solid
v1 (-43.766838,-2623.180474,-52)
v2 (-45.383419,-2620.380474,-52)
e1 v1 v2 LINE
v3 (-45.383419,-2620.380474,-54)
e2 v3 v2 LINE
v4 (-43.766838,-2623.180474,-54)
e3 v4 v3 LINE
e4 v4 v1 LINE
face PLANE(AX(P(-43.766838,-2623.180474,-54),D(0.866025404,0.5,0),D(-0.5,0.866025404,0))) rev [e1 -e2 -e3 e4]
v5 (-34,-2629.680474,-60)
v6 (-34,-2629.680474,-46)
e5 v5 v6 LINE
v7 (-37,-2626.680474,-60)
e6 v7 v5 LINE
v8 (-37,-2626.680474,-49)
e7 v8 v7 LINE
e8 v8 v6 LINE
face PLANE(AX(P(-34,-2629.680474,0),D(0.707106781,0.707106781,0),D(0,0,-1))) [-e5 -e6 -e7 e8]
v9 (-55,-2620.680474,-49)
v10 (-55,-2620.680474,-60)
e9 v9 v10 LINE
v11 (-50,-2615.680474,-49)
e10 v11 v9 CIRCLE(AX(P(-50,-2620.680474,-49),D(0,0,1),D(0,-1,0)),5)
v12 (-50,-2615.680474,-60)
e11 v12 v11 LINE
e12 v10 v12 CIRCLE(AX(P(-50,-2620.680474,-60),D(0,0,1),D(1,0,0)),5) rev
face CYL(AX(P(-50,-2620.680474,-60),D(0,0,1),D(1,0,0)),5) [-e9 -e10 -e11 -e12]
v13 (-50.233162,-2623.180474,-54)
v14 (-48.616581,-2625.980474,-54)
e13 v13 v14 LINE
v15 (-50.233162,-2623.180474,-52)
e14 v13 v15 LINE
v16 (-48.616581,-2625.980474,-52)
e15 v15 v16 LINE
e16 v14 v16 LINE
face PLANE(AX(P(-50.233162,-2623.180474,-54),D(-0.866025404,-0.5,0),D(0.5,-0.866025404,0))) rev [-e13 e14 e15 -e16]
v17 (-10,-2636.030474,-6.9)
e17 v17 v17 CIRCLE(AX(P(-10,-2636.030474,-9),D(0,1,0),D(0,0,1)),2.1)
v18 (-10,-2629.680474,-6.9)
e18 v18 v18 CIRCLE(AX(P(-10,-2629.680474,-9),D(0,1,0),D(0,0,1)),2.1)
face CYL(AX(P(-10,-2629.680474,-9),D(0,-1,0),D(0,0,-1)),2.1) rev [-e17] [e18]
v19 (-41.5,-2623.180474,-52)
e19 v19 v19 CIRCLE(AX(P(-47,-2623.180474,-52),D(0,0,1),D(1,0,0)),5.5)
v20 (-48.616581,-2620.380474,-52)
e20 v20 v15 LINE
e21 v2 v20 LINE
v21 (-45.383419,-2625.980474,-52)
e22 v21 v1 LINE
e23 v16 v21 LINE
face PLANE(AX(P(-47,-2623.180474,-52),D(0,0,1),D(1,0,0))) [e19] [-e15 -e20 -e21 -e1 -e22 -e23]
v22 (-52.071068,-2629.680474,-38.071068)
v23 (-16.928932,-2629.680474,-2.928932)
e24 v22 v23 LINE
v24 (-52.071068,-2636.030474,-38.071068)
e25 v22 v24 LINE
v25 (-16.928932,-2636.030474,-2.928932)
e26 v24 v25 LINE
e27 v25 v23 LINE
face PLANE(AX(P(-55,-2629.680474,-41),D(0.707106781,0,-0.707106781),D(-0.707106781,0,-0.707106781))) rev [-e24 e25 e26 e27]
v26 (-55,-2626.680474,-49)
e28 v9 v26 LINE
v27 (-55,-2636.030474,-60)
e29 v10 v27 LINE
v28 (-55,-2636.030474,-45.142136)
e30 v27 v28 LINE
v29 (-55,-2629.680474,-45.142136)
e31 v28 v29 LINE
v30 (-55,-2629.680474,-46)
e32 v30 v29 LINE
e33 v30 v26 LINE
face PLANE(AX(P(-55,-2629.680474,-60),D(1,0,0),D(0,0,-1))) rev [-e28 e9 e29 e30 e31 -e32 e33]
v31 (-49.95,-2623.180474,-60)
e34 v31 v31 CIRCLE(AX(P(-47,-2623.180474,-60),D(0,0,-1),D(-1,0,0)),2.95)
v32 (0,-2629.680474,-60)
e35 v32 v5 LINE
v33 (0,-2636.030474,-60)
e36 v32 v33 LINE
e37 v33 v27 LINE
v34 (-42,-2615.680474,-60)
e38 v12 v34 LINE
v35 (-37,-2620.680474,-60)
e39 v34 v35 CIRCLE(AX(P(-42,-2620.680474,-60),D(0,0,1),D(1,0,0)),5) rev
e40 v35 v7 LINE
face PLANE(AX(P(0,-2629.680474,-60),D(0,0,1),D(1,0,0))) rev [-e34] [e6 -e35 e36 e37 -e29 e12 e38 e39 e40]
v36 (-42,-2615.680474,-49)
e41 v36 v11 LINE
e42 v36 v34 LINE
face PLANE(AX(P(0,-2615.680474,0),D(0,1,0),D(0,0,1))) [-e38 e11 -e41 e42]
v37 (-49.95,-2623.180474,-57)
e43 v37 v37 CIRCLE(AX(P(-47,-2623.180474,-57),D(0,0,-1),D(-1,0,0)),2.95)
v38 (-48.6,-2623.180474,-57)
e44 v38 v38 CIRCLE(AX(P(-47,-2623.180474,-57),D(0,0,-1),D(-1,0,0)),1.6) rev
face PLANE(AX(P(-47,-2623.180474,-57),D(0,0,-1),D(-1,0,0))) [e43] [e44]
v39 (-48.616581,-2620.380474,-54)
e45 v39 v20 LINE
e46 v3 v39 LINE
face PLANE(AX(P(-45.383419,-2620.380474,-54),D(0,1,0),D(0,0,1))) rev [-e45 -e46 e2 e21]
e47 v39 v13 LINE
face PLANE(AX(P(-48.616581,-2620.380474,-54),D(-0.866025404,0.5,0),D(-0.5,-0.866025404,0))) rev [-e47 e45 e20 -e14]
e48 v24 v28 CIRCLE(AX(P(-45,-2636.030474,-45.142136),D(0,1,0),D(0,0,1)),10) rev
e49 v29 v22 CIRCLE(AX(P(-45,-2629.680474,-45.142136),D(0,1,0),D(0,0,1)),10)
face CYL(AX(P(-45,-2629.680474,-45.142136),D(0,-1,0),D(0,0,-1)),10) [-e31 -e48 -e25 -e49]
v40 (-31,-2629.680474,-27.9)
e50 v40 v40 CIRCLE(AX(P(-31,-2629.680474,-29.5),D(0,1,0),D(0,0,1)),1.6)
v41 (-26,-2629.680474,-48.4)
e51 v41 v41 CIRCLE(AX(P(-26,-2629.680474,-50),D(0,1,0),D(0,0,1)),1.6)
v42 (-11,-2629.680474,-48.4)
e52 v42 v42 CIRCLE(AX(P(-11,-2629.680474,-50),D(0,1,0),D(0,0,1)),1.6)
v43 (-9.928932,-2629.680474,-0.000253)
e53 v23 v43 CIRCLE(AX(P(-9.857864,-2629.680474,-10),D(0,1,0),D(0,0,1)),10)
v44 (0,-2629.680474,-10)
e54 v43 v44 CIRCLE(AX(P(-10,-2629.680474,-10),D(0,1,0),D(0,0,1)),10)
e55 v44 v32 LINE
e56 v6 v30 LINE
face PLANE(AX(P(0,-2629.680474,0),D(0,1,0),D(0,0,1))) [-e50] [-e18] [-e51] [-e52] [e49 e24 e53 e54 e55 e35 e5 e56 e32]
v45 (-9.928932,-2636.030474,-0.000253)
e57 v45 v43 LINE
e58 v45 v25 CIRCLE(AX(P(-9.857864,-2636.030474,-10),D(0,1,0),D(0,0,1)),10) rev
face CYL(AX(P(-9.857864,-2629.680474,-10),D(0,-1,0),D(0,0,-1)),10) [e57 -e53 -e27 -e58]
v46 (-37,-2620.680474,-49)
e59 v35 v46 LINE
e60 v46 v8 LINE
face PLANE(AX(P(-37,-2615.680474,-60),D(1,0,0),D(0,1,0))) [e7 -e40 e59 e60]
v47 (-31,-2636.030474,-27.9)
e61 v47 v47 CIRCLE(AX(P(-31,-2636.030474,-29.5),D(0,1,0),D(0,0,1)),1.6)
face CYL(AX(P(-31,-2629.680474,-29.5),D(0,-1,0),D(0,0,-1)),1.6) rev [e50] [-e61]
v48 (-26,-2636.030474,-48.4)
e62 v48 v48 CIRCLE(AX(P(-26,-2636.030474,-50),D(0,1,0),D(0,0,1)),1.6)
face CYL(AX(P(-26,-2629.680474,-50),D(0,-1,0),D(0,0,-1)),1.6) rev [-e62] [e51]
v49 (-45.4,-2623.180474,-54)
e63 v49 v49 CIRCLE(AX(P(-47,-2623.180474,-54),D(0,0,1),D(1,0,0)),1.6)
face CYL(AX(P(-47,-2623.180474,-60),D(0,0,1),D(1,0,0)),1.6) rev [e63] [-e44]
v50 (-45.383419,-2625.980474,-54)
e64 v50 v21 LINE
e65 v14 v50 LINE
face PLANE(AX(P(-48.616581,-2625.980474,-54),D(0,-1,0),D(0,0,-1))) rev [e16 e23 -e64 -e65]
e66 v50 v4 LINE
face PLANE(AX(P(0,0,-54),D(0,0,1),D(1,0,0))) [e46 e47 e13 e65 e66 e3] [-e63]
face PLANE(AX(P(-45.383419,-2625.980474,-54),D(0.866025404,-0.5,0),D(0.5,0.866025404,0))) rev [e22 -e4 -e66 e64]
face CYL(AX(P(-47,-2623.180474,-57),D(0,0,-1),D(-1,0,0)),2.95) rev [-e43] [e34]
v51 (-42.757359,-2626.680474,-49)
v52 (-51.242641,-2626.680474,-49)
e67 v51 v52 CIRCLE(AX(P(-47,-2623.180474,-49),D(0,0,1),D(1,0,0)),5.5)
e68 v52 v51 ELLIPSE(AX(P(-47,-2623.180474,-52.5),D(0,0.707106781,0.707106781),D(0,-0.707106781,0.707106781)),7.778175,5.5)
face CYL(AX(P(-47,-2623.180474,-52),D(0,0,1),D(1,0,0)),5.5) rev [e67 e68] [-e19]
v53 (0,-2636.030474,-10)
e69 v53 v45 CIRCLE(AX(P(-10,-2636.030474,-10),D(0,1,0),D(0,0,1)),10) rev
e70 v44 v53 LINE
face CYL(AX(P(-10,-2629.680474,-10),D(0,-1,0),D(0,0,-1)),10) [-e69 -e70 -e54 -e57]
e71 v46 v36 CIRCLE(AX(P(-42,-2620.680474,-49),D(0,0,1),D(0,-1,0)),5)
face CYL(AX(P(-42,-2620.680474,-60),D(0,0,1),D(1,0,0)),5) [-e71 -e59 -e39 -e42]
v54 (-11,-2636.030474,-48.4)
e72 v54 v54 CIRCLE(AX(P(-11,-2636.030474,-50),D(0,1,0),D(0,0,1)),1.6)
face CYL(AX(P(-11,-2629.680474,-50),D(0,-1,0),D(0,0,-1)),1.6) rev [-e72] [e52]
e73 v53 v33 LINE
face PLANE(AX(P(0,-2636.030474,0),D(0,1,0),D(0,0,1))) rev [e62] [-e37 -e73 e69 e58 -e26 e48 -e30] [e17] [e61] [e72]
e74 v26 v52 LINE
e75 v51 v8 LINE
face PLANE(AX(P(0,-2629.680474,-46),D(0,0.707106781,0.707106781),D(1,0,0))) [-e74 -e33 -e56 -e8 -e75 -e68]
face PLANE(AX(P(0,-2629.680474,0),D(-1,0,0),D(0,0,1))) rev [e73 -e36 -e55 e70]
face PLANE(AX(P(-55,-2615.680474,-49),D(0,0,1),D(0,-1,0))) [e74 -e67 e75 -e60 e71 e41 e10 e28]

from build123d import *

# Parameters (mm, degrees)
SKETCH1_R           = 2.1
SKETCH1_R_2         = 1.6
BOSS_EXTRUDE1_DEPTH = 6.35
SKETCH2_W           = 18
SKETCH2_H           = 11
BOSS_EXTRUDE2_DEPTH = 14
SKETCH3_R           = 5.5
CUT_EXTRUDE1_DEPTH  = 3
CHAMFER1_SIZE       = 3
FILLET2_R           = 10
FILLET3_R           = 5
CUT_EXTRUDE2_DEPTH  = 2
SKETCH5_R           = 1.6
CUT_EXTRUDE3_DEPTH  = 2638.157111638
SKETCH6_R           = 2.95
CUT_EXTRUDE4_DEPTH  = 3


with BuildPart() as part:
    # Sketch1 → Boss-Extrude1 (new body)
    with BuildSketch(Plane(origin=(251.886129178, -2636.030473787, -0.277944786), x_dir=(1, 0, 0), z_dir=(0, 1, 0))):
        Polygon((-265.886129178, -0.277944786), (-251.886129178, -0.277944786), (-251.886129178, 59.722055214), (-306.886129178, 59.722055214), (-306.886129178, 40.722055214), align=None)
        with Locations(Location((-261.886129178, 8.722055214, 0), (0, 0, 270))):
            Circle(SKETCH1_R, mode=Mode.SUBTRACT)
        with Locations(Location((-282.886129178, 29.222055214, 0), (0, 0, 270))):
            Circle(SKETCH1_R_2, mode=Mode.SUBTRACT)
        with Locations(Location((-262.886129178, 49.722055214, 0), (0, 0, 270))):
            Circle(SKETCH1_R_2, mode=Mode.SUBTRACT)
        with Locations(Location((-277.886129178, 49.722055214, 0), (0, 0, 270))):
            Circle(SKETCH1_R_2, mode=Mode.SUBTRACT)
    extrude(amount=BOSS_EXTRUDE1_DEPTH)

    # Sketch2 → Boss-Extrude2 (add)
    with BuildSketch(Plane(origin=(-55, -2629.680473787, -60), x_dir=(1, 0, 0), z_dir=(0, -1, 0))):
        with Locations((9, 5.5)):
            Rectangle(SKETCH2_W, SKETCH2_H)
    extrude(amount=-BOSS_EXTRUDE2_DEPTH)

    # Sketch3 → Cut-Extrude1 (cut)
    with BuildSketch(Plane.XY.offset(-49)):
        with Locations((-47, -2623.180473787)):
            Circle(SKETCH3_R)
    extrude(amount=-CUT_EXTRUDE1_DEPTH, mode=Mode.SUBTRACT)

    # Chamfer1
    # the kernel refuses this chamfer: 3 mm, written as the material it adds along each edge
    with BuildSketch(Plane(origin=(-37, -2629.680473787, -49), x_dir=(0, -0.02749587661065579, 0.9996219169112949), z_dir=(-1, 0, 0))) as chamfer1_piece_1_section:
        Polygon((CHAMFER1_SIZE * 0.999621916911, CHAMFER1_SIZE * 0.0274958766107), (-CHAMFER1_SIZE * 0.0274958766107, CHAMFER1_SIZE * 0.999621916911), (0, 0), align=None)
    chamfer1_piece_1 = extrude(amount=18, mode=Mode.PRIVATE)
    chamfer1_piece_1 = chamfer1_piece_1 - Plane(origin=(-47, -2623.180473787, -47.945016367), x_dir=(1, 0, 0), z_dir=(0, 0, 1)) * Cylinder(5.5, 48, mode=Mode.PRIVATE)
    add(chamfer1_piece_1)
    with BuildSketch(Plane(origin=(-37, -2629.680473787, -60), x_dir=(0.9996219169112948, -0.027495876610655785, 0), z_dir=(0, 0, 1))) as chamfer1_piece_2:
        Polygon((CHAMFER1_SIZE * 0.999621916911, CHAMFER1_SIZE * 0.0274958766107), (-CHAMFER1_SIZE * 0.0274958766107, CHAMFER1_SIZE * 0.999621916911), (0, 0), align=None)
    extrude(amount=11)
    with BuildSketch(Plane(origin=(-29.284951036, -2629.680473787, -49), x_dir=(0, -0.02749587661065579, 0.9996219169112949), z_dir=(-1, 0, 0))) as chamfer1_piece_3a_section:
        Polygon((CHAMFER1_SIZE * 0.999621916911, CHAMFER1_SIZE * 0.0274958766107), (-CHAMFER1_SIZE * 0.0274958766107, CHAMFER1_SIZE * 0.999621916911), (0, 0), align=None)
    chamfer1_piece_3a = extrude(amount=25.715048964, mode=Mode.PRIVATE)
    chamfer1_piece_3a = split(chamfer1_piece_3a, bisect_by=Plane(origin=(-37, -2628.691092907, -48.01061912), z_dir=(1, 0, 0)), keep=Keep.TOP, mode=Mode.PRIVATE)
    with BuildSketch(Plane(origin=(-37, -2629.680473787, -60), x_dir=(0.9996219169112948, -0.027495876610655785, 0), z_dir=(0, 0, 1))) as chamfer1_piece_3b_section:
        Polygon((CHAMFER1_SIZE * 0.999621916911, CHAMFER1_SIZE * 0.0274958766107), (-CHAMFER1_SIZE * 0.0274958766107, CHAMFER1_SIZE * 0.999621916911), (0, 0), align=None)
    chamfer1_piece_3b = extrude(amount=18.715048964, mode=Mode.PRIVATE)
    chamfer1_piece_3b = split(chamfer1_piece_3b, bisect_by=Plane(origin=(-36.01061912, -2628.691092907, -49), z_dir=(0, 0, 1)), keep=Keep.TOP, mode=Mode.PRIVATE)
    chamfer1_piece_3 = chamfer1_piece_3a & chamfer1_piece_3b
    add(chamfer1_piece_3)

    # Fillet2
    # the kernel refuses this fillet: 10 mm, written as the material it takes off along each edge
    with BuildSketch(Plane(origin=(-14, -2646.385812847, 0), x_dir=(1, 0, 0), z_dir=(0, 1, 0)), Plane(origin=(-55, -2646.385812847, -41), x_dir=(0.7071067811865518, 0, 0.7071067811865432), z_dir=(0, 1, 0))) as fillet2_piece_1:
        with BuildLine():
            CenterArc((FILLET2_R * 0.414213562373, FILLET2_R), FILLET2_R, 225, 45)
            Line((-FILLET2_R * 0.292893218813, FILLET2_R * 0.292893218813), (0, 0))
            Line((0, 0), (FILLET2_R * 0.414213562373, 0))
        make_face()
    extrude(amount=27.060678119, mode=Mode.SUBTRACT)
    with BuildSketch(Plane(origin=(0, -2661.030473787, 0), x_dir=(0, 0, -1), z_dir=(0, 1, 0))) as fillet2_piece_2:
        with BuildLine():
            CenterArc((FILLET2_R, FILLET2_R), FILLET2_R, 180, 90)
            Line((0, FILLET2_R), (0, 0))
            Line((0, 0), (FILLET2_R, 0))
        make_face()
    extrude(amount=56.35, mode=Mode.SUBTRACT)

    # Fillet3
    fillet3_edges = [part.edges().sort_by_distance(p)[0] for p in [
        (-37, -2615.680473787, -54.5),
        (-55, -2615.680473787, -54.5),
    ]]
    fillet(fillet3_edges, radius=FILLET3_R)

    # Sketch4 → Cut-Extrude2 (cut)
    with BuildSketch(Plane.XY.offset(-52)):
        Polygon((-45.383419246, -2625.980473787), (-43.766838493, -2623.180473787), (-45.383419246, -2620.380473787), (-48.616580754, -2620.380473787), (-50.233161507, -2623.180473787), (-48.616580754, -2625.980473787), align=None)
    extrude(amount=-CUT_EXTRUDE2_DEPTH, mode=Mode.SUBTRACT)

    # Sketch5 → Cut-Extrude3 (cut, through all)
    with BuildSketch(Plane.XY.offset(-54)):
        with Locations((-47, -2623.180473787)):
            Circle(SKETCH5_R)
    extrude(amount=-CUT_EXTRUDE3_DEPTH, mode=Mode.SUBTRACT)

    # Sketch6 → Cut-Extrude4 (cut)
    with BuildSketch(Plane(origin=(0, 0, -60), x_dir=(-1, 0, 0), z_dir=(0, 0, -1))):
        with Locations((47, -2623.180473787)):
            Circle(SKETCH6_R)
    extrude(amount=-CUT_EXTRUDE4_DEPTH, mode=Mode.SUBTRACT)


solid = part.part
